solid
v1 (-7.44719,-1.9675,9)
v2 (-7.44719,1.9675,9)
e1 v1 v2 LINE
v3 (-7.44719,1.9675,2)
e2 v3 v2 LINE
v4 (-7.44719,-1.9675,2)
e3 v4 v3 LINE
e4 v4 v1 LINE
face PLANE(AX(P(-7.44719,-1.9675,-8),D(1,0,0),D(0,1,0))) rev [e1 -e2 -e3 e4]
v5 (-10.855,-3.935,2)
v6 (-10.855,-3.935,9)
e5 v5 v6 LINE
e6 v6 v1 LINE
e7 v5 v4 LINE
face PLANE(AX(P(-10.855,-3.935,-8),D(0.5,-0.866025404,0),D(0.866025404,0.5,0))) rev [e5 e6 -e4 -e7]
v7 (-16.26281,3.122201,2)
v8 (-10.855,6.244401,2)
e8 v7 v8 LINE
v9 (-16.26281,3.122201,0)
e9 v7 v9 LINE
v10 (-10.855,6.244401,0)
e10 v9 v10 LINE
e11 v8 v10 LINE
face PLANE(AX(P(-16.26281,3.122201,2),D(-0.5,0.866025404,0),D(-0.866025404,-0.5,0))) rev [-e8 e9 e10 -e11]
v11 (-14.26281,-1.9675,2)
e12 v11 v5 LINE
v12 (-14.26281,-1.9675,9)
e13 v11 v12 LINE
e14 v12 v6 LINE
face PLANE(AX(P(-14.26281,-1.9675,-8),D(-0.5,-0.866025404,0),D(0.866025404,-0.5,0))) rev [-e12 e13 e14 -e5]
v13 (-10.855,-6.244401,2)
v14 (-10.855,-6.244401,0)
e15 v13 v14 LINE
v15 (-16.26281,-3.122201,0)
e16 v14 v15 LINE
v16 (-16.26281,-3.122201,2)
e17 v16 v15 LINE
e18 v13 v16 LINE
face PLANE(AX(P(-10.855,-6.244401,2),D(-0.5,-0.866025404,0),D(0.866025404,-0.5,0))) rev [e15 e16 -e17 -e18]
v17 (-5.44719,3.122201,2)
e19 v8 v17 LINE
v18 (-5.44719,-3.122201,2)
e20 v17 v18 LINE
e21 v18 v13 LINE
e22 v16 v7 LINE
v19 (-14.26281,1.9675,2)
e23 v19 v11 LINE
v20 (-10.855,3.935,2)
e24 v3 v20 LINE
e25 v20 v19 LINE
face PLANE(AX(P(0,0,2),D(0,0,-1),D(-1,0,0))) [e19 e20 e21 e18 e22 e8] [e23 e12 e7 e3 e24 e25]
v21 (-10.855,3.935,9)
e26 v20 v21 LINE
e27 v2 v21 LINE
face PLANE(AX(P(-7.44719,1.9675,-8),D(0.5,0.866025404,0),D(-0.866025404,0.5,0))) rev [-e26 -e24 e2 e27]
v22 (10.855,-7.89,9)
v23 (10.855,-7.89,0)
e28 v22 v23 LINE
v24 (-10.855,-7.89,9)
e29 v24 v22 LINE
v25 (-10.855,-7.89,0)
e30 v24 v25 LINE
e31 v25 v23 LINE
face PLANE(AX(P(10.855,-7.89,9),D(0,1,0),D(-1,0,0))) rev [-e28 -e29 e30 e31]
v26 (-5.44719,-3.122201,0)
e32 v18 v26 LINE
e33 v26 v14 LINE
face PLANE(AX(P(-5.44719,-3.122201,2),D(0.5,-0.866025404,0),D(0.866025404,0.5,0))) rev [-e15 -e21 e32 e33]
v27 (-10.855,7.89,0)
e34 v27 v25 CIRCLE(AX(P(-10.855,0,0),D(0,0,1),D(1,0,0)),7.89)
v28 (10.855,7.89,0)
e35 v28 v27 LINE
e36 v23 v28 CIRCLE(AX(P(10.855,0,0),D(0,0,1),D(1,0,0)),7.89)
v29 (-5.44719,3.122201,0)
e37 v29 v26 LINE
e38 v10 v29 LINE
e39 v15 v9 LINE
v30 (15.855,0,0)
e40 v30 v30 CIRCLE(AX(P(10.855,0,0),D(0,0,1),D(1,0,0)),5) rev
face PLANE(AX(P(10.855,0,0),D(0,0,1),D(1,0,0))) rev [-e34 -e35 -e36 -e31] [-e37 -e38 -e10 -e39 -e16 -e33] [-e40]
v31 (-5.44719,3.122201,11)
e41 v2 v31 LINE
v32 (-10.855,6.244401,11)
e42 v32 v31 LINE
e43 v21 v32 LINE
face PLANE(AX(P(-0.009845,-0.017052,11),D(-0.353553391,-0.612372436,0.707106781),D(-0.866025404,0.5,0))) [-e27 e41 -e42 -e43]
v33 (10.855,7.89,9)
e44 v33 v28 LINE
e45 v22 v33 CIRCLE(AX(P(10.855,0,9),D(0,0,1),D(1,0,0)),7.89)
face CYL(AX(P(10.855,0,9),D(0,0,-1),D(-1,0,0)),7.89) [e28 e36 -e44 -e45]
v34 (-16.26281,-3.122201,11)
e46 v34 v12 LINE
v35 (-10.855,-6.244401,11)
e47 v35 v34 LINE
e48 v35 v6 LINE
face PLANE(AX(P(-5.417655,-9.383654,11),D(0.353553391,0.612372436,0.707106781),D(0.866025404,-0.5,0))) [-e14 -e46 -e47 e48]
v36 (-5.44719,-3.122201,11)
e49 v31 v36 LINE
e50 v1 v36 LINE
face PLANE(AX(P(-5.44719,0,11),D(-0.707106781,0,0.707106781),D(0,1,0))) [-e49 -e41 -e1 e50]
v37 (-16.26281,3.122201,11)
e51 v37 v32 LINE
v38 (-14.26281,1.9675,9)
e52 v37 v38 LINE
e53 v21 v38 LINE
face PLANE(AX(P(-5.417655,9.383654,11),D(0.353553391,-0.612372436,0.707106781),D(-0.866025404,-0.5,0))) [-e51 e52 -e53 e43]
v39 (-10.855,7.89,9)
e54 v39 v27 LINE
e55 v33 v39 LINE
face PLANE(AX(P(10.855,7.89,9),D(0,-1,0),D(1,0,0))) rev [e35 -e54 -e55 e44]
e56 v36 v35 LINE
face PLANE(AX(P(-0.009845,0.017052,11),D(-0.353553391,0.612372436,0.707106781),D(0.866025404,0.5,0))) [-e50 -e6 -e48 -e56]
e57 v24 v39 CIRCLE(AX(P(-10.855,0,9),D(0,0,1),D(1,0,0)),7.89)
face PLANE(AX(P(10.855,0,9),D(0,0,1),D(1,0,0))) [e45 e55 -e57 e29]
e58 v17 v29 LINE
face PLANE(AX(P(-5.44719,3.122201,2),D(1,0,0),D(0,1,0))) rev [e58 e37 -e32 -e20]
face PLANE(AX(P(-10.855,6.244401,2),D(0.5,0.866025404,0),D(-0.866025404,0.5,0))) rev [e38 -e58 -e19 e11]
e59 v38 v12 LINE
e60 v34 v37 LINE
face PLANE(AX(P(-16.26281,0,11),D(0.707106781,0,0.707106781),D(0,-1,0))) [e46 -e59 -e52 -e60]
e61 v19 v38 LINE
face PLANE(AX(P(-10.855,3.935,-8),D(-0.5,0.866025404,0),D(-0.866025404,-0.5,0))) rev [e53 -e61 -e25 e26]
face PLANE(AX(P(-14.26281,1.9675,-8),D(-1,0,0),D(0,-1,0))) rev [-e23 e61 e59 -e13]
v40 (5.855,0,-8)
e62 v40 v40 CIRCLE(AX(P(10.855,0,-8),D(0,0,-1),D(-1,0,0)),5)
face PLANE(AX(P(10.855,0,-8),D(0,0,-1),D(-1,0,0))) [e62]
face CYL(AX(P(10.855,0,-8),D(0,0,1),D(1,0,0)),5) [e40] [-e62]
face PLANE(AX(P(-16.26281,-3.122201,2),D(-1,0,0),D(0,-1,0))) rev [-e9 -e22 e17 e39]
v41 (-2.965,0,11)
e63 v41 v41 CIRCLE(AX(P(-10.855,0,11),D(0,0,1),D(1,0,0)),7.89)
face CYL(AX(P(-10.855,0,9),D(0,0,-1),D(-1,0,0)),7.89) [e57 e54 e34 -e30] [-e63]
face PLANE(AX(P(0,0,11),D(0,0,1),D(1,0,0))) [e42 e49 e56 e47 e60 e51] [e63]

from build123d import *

# Parameters (mm, degrees)
BOSS_EXTRU_1_DEPTH      = 9
ESQUISSE3_R             = 5
BOSS_EXTRU_3_DEPTH      = 8
ENL_V_MAT_EXTRU_1_DEPTH = 27.507114611
ENL_V_MAT_EXTRU_2_DEPTH = 2
BOSS_EXTRU_4_DEPTH      = 2
CHANFREIN1_SIZE         = 2


with BuildPart() as part:
    # Esquisse1 → Boss.-Extru.1 (new body)
    with BuildSketch(Plane(origin=(0, 0, 0), x_dir=(0, 1, 0), z_dir=(0, 0, 1))):
        with BuildLine():
            Line((-7.89, -10.855), (-7.89, 10.855))
            ThreePointArc((-7.89, 10.855), (0, 18.745), (7.89, 10.855))
            Line((7.89, 10.855), (7.89, -10.855))
            ThreePointArc((7.89, -10.855), (0, -18.745), (-7.89, -10.855))
        make_face()
    extrude(amount=BOSS_EXTRU_1_DEPTH)

    # Esquisse3 → Boss.-Extru.3 (add)
    with BuildSketch(Plane(origin=(0, 0, 0), x_dir=(1, 0, 0), z_dir=(0, 0, -1))):
        with Locations((10.855, 0)):
            Circle(ESQUISSE3_R)
    extrude(amount=BOSS_EXTRU_3_DEPTH)

    # Esquisse2 → Enlèv. mat.-Extru.1 (cut, through all)
    with BuildSketch(Plane.XY.offset(9)):
        Polygon((-10.855, 3.935), (-14.262809964, 1.9675), (-14.262809964, -1.9675), (-10.855, -3.935), (-7.447190036, -1.9675), (-7.447190036, 1.9675), align=None)
    extrude(amount=-ENL_V_MAT_EXTRU_1_DEPTH, mode=Mode.SUBTRACT)

    # Esquisse4 → Enlèv. mat.-Extru.2 (cut)
    with BuildSketch(Plane(origin=(0, 0, 0), x_dir=(1, 0, 0), z_dir=(0, 0, -1))):
        Polygon((-5.447190036, -3.122200538), (-5.447190036, 3.122200538), (-10.855, 6.244401077), (-16.262809964, 3.122200538), (-16.262809964, -3.122200538), (-10.855, -6.244401077), align=None)
    extrude(amount=-ENL_V_MAT_EXTRU_2_DEPTH, mode=Mode.SUBTRACT)

    # Esquisse5 → Boss.-Extru.4 (add)
    with BuildSketch(Plane.XY.offset(9)):
        with BuildLine():
            ThreePointArc((-10.855, -7.89), (-5.275927496, -5.579072504), (-2.965, 0))
            ThreePointArc((-2.965, 0), (-5.275927496, 5.579072504), (-10.855, 7.89))
            ThreePointArc((-10.855, 7.89), (-18.745, 0), (-10.855, -7.89))
        make_face()
        Polygon((-10.855, 3.935), (-7.447190036, 1.9675), (-7.447190036, -1.9675), (-10.855, -3.935), (-14.262809964, -1.9675), (-14.262809964, 1.9675), align=None, mode=Mode.SUBTRACT)
    extrude(amount=BOSS_EXTRU_4_DEPTH)

    # Chanfrein1
    chanfrein1_edges = [part.edges().sort_by_distance(p)[0] for p in [
        (-9.151095018, 2.95125, 11),
        (-7.447190036, 0, 11),
        (-9.151095018, -2.95125, 11),
        (-12.558904982, -2.95125, 11),
        (-14.262809964, 0, 11),
        (-12.558904982, 2.95125, 11),
    ]]
    chamfer(chanfrein1_edges, length=CHANFREIN1_SIZE - 0.0001)  # a hair under: the kernel refuses the full size


solid = part.part
